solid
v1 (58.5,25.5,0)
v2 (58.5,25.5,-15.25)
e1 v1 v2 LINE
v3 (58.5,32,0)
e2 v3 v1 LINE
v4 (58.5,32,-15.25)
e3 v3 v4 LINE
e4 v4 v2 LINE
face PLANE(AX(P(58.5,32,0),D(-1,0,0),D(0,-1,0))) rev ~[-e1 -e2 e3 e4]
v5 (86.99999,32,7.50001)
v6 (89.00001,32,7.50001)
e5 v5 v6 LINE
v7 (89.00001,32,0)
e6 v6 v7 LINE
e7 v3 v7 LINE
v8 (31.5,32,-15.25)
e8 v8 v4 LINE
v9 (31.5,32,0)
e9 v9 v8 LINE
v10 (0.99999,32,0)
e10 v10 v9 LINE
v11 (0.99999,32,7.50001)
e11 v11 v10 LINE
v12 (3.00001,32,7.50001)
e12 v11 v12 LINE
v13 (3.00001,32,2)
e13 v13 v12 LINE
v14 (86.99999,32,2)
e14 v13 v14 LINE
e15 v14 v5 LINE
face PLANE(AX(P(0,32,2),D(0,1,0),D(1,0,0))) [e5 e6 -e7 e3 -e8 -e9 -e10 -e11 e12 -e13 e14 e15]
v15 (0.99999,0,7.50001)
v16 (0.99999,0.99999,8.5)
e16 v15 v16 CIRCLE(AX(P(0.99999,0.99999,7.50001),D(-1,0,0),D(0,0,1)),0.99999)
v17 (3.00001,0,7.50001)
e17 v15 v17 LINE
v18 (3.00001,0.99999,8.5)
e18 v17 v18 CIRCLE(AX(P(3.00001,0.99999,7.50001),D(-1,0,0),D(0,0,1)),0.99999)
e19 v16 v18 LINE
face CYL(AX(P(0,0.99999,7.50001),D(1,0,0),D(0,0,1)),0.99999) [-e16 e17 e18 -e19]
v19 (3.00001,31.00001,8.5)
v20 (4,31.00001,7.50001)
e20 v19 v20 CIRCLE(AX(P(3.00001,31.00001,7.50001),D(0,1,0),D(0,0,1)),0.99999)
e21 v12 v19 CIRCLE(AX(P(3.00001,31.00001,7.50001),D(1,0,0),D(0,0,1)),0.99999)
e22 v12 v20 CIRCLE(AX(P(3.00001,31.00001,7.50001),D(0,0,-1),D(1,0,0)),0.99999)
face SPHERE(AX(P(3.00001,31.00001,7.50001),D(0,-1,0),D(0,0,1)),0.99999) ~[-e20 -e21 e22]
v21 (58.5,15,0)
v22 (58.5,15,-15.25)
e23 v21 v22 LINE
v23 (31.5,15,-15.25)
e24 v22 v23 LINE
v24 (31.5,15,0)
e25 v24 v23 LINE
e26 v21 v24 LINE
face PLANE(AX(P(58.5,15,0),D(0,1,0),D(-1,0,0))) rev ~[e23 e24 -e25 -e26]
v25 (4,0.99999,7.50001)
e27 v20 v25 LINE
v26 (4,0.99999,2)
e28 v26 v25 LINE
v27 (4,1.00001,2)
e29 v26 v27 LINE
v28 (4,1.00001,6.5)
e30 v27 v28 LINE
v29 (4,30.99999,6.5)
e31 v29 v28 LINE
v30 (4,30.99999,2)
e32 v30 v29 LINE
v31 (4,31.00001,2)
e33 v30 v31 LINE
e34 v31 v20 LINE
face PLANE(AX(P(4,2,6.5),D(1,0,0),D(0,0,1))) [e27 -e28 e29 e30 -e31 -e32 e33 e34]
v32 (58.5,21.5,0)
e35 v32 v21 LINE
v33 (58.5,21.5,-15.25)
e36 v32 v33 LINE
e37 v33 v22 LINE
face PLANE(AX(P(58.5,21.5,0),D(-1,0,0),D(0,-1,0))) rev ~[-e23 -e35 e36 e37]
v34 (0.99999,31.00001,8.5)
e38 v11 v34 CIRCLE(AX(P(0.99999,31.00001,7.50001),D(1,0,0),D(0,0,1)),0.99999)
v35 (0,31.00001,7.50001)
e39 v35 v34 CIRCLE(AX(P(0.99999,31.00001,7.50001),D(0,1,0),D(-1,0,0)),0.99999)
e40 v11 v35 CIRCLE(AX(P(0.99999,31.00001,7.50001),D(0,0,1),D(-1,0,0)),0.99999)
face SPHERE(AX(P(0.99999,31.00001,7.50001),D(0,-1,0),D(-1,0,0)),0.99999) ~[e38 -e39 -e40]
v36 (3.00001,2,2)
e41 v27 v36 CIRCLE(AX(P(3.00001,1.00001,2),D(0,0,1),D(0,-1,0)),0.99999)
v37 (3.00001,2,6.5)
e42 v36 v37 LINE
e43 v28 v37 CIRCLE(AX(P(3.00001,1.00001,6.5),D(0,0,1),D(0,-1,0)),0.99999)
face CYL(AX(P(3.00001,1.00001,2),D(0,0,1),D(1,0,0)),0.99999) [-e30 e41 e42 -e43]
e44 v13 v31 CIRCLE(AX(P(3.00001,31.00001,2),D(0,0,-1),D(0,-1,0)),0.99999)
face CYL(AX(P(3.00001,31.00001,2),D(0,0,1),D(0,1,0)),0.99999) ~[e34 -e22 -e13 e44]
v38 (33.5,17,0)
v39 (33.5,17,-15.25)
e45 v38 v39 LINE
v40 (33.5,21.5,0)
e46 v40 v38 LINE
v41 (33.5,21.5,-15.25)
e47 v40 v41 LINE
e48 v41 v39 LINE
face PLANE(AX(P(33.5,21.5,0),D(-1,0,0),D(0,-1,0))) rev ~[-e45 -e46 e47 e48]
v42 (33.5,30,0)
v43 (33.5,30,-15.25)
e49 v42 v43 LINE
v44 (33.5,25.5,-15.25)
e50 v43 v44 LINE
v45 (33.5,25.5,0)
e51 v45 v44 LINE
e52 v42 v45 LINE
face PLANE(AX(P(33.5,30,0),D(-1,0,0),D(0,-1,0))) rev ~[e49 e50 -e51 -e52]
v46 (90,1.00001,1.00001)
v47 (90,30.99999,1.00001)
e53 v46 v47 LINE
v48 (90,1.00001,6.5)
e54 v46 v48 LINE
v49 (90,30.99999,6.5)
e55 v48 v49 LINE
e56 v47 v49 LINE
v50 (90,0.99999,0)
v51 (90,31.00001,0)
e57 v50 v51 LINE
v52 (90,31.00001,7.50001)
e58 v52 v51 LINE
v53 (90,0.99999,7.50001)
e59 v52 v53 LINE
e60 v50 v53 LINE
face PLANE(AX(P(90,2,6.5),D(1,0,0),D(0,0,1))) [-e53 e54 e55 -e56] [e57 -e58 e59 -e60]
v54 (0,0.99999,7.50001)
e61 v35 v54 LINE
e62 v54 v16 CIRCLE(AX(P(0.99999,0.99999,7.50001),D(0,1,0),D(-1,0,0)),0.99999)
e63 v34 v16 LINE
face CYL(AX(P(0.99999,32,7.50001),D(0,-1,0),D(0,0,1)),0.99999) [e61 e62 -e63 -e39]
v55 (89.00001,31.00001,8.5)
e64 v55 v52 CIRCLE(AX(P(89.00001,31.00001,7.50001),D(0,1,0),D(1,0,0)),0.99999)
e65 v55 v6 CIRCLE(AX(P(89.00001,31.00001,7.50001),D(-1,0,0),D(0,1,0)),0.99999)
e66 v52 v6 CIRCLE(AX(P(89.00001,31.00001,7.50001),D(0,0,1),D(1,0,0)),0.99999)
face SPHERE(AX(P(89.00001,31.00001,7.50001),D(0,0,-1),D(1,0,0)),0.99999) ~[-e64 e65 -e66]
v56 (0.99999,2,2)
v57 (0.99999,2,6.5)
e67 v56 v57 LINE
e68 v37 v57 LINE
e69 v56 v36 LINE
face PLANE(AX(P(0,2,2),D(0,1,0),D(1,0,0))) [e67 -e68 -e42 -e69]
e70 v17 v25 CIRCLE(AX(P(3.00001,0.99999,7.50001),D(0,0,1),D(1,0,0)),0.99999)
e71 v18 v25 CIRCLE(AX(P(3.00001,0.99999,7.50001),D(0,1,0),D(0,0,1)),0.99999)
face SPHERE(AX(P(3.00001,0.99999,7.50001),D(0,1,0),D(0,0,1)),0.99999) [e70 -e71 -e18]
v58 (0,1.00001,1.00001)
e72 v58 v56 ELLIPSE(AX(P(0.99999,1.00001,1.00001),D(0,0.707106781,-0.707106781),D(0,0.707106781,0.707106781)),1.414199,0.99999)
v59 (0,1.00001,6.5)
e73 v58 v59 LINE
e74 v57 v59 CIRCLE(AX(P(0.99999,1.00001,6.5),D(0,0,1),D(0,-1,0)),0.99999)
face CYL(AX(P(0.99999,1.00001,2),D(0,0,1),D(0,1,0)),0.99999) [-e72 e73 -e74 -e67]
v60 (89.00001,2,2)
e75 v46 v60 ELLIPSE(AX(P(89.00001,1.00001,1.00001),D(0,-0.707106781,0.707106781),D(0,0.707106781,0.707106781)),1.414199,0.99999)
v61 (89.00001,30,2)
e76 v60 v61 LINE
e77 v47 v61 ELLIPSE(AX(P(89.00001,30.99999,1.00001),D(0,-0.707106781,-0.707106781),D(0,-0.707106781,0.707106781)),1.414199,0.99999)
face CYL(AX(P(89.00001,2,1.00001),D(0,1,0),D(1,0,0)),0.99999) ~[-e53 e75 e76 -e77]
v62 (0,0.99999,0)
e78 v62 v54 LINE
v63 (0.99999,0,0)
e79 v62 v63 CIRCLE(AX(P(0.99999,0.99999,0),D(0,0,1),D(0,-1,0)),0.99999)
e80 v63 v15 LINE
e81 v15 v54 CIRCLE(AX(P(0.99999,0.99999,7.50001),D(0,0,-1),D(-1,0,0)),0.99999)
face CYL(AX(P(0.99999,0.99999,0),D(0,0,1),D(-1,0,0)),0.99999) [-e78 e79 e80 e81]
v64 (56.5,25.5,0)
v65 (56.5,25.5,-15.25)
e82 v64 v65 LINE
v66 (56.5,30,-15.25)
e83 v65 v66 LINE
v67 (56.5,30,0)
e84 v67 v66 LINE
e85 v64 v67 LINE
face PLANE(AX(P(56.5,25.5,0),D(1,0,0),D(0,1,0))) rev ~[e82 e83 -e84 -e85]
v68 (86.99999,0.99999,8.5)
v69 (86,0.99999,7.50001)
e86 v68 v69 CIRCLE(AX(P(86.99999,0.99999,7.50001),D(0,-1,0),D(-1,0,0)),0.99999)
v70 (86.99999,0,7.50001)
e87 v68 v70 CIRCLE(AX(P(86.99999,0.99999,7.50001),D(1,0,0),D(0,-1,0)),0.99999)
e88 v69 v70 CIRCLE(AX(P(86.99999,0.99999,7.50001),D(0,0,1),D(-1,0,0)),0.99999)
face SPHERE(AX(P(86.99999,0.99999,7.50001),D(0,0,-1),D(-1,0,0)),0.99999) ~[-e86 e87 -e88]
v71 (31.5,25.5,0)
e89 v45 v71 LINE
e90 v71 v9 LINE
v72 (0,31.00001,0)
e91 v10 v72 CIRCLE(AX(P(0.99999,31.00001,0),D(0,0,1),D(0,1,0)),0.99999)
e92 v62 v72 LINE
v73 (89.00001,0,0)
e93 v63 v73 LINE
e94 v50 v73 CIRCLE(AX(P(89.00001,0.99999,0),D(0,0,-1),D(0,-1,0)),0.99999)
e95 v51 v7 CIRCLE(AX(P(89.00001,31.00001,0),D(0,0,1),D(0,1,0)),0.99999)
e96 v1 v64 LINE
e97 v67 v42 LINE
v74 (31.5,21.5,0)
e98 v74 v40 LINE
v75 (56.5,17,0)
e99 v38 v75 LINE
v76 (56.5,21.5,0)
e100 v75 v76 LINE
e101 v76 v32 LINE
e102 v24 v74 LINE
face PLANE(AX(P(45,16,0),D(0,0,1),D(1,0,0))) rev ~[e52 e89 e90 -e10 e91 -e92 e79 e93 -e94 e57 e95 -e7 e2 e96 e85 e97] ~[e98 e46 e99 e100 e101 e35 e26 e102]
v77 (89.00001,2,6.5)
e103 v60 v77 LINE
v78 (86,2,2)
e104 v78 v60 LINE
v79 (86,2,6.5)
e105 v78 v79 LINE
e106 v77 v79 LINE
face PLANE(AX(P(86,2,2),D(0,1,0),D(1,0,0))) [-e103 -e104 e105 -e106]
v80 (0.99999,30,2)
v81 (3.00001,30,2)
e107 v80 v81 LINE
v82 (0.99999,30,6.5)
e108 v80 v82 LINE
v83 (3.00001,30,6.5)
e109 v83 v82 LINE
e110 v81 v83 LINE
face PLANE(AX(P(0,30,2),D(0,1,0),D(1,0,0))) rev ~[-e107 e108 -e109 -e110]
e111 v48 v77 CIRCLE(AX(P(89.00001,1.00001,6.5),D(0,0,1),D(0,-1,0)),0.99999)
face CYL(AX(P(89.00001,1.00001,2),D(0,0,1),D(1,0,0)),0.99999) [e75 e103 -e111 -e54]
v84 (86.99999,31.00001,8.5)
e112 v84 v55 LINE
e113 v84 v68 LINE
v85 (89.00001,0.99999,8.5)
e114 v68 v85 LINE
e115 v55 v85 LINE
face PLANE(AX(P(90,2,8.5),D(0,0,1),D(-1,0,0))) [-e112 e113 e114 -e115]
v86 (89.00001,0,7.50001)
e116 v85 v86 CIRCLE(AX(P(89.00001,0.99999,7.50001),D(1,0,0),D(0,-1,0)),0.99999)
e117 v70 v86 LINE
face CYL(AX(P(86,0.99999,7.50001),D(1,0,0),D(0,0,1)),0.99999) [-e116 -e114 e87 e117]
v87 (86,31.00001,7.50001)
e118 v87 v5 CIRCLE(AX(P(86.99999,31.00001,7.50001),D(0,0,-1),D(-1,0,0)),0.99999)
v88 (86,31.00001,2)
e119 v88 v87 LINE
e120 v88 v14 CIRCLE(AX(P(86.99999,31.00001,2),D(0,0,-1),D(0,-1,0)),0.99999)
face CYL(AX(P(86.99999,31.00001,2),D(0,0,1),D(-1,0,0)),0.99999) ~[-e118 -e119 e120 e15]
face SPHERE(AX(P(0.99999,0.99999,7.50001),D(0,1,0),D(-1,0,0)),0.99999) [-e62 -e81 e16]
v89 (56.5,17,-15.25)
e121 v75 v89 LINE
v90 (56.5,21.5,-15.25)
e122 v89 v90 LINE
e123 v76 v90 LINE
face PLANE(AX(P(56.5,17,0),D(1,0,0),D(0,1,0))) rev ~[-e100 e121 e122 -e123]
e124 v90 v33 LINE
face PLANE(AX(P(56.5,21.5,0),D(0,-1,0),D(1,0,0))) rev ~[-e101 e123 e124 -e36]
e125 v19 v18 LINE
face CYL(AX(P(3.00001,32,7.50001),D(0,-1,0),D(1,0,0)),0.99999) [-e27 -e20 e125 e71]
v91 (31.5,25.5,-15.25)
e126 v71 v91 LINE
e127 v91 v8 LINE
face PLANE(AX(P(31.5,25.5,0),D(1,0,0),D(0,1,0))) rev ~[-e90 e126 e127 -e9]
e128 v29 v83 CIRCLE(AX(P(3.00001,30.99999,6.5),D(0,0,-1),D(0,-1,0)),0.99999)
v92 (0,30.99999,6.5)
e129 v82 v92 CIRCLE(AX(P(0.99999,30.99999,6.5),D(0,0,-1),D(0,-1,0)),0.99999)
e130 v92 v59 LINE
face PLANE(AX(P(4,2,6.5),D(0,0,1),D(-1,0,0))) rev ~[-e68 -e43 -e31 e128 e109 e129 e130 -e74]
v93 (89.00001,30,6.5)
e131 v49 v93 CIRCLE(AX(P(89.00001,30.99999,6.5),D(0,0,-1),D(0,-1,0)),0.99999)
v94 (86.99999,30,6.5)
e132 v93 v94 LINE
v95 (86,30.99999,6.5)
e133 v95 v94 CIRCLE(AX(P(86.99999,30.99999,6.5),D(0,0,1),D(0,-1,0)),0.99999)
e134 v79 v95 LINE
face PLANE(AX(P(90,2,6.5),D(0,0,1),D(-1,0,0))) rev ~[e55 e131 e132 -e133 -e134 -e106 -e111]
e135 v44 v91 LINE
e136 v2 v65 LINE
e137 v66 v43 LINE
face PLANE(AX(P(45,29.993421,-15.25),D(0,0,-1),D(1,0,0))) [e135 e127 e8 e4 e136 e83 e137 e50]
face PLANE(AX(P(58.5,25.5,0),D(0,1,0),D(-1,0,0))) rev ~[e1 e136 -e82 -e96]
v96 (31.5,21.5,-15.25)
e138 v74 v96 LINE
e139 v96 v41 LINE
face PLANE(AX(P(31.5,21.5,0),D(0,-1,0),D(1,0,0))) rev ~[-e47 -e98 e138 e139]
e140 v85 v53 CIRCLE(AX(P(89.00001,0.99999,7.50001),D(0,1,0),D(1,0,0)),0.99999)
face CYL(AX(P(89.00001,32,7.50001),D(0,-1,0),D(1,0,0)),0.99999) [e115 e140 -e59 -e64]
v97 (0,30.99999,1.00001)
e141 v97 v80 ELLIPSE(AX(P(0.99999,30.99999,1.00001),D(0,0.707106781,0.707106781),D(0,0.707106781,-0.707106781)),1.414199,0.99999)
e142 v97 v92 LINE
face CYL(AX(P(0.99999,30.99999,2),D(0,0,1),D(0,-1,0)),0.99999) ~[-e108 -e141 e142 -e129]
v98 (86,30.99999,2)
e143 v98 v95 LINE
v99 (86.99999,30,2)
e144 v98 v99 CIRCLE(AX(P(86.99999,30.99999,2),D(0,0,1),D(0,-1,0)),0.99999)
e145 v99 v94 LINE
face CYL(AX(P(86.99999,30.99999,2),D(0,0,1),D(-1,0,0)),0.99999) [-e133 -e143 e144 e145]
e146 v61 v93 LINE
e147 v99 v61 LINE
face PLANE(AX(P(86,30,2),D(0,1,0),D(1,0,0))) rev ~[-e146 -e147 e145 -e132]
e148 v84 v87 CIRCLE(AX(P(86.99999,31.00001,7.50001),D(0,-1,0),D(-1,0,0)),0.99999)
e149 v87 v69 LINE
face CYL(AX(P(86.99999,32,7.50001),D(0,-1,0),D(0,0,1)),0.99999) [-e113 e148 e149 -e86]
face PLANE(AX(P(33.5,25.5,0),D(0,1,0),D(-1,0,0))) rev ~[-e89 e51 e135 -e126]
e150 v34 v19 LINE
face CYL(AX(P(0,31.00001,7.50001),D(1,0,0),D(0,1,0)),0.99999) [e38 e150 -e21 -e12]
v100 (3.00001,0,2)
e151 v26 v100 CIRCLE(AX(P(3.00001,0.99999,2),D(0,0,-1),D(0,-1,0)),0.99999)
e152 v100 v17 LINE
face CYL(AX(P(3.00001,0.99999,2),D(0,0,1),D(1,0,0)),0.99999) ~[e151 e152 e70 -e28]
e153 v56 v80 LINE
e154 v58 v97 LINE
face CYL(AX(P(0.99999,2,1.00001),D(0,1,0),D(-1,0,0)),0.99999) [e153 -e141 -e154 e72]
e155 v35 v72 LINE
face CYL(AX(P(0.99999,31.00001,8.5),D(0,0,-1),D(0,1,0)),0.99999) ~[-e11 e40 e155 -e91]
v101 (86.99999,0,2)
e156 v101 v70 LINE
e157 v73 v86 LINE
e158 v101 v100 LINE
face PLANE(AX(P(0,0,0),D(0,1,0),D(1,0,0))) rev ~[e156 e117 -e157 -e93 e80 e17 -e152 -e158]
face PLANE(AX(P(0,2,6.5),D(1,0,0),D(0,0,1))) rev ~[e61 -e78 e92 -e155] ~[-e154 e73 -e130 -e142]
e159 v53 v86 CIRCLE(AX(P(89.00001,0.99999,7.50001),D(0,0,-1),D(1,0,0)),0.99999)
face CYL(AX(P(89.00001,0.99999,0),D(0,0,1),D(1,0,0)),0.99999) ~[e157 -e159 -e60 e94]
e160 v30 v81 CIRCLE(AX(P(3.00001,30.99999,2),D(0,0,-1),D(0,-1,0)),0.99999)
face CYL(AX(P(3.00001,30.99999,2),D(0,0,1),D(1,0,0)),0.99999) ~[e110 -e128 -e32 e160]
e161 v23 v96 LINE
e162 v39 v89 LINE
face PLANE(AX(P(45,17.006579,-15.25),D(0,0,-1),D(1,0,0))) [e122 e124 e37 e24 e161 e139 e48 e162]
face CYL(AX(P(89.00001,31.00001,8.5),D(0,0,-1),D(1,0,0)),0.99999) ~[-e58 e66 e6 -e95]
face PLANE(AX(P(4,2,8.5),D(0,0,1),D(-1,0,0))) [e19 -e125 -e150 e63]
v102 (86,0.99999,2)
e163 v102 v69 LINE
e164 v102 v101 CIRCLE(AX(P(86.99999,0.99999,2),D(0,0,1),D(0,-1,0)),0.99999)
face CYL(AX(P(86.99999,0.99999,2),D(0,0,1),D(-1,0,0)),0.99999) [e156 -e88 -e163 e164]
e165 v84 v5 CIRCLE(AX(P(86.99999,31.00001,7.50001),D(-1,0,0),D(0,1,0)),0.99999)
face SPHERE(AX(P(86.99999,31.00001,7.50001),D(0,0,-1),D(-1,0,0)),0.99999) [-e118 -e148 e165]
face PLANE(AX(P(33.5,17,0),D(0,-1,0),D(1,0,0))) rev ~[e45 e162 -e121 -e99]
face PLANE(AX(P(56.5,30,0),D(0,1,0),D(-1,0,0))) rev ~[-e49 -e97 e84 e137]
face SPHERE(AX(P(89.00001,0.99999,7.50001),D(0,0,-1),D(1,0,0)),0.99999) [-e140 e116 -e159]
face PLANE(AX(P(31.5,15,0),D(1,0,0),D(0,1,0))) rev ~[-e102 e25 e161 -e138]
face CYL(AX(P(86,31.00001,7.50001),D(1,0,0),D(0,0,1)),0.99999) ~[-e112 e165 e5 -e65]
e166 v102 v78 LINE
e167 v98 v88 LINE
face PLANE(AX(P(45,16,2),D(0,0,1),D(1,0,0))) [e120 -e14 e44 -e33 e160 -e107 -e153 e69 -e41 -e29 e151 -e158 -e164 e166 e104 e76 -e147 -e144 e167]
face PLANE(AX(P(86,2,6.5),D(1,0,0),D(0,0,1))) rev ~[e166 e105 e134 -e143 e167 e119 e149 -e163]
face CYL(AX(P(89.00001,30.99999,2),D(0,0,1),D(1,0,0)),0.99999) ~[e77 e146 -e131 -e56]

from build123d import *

# Parameters (mm, degrees)
F0_W      = 90
F0_H      = 32
F1_DEPTH  = 2
F2_W      = 4
F2_H      = 2
F3_DEPTH  = 6.5
F5_W      = 4
F5_H      = 2
F6_DEPTH  = 28
F4_W      = 4
F4_H      = 2
F7_DEPTH  = 28
F8_R      = 0.99999
F10_DEPTH = 15.25


# Not quite as in the source:
# - a fillet or chamfer is up to 0.001 mm smaller than in the source, because OpenCascade refuses the exact size


with BuildPart() as f1:
    # F0 (on Top) → F1 (new body)
    with BuildSketch(Plane.XY):
        with Locations((45, 16)):
            Rectangle(F0_W, F0_H)
    extrude(amount=F1_DEPTH)

    # F2 (on face) → F3 (join)
    with BuildSketch(Plane.XY.offset(2)):
        with Locations((2, 31)):
            Rectangle(F2_W, F2_H)
        with Locations((2, 1)):
            Rectangle(F2_W, F2_H)
        with Locations((88, 1)):
            Rectangle(F2_W, F2_H)
        with Locations((88, 31)):
            Rectangle(F2_W, F2_H)
    extrude(amount=F3_DEPTH)

    # F5 (on face) → F6 (join)
    with BuildSketch(Plane(origin=(0, 2, 0), x_dir=(-1, 0, 0), z_dir=(0, 1, 0))):
        with Locations((-2, 7.5)):
            Rectangle(F5_W, F5_H)
    extrude(amount=F6_DEPTH)

    # F4 (on face) → F7 (join)
    with BuildSketch(Plane(origin=(0, 2, 0), x_dir=(-1, 0, 0), z_dir=(0, 1, 0))):
        with Locations((-88, 7.5)):
            Rectangle(F4_W, F4_H)
    extrude(amount=F7_DEPTH)

    # F8 (radius 1 in the source; OpenCascade refuses exactly that, so slightly less here)
    f8_edges = [f1.edges().sort_by_distance(p)[0] for p in [
        (0, 16, 8.5),
        (4, 16, 8.5),
        (0, 32, 4.25),
        (0, 0, 4.25),
        (0, 16, 2),
        (2, 32, 8.5),
        (2, 0, 8.5),
        (0, 30, 4.25),
        (0, 2, 4.25),
        (4, 2, 4.25),
        (4, 30, 4.25),
        (4, 32, 5.25),
        (4, 0, 5.25),
        (86, 0, 5.25),
        (90, 0, 4.25),
        (86, 30, 4.25),
        (90, 30, 4.25),
        (86, 32, 5.25),
        (90, 32, 4.25),
        (90, 16, 8.5),
        (86, 16, 8.5),
        (88, 0, 8.5),
        (88, 32, 8.5),
        (90, 2, 4.25),
        (90, 16, 2),
    ]]
    fillet(f8_edges, radius=F8_R)

    # F9 (on face) → F10 (join)
    with BuildSketch(Plane(origin=(0, 0, 0), x_dir=(1, 0, 0), z_dir=(0, 0, -1))):
        Polygon((33.5, -30), (33.5, -25.5), (31.5, -25.5), (31.5, -32), (58.5, -32), (58.5, -25.5), (56.5, -25.5), (56.5, -30), align=None)
        Polygon((33.5, -21.5), (33.5, -17), (56.5, -17), (56.5, -21.5), (58.5, -21.5), (58.5, -15), (31.5, -15), (31.5, -21.5), align=None)
    extrude(amount=F10_DEPTH)


solid = f1.part
